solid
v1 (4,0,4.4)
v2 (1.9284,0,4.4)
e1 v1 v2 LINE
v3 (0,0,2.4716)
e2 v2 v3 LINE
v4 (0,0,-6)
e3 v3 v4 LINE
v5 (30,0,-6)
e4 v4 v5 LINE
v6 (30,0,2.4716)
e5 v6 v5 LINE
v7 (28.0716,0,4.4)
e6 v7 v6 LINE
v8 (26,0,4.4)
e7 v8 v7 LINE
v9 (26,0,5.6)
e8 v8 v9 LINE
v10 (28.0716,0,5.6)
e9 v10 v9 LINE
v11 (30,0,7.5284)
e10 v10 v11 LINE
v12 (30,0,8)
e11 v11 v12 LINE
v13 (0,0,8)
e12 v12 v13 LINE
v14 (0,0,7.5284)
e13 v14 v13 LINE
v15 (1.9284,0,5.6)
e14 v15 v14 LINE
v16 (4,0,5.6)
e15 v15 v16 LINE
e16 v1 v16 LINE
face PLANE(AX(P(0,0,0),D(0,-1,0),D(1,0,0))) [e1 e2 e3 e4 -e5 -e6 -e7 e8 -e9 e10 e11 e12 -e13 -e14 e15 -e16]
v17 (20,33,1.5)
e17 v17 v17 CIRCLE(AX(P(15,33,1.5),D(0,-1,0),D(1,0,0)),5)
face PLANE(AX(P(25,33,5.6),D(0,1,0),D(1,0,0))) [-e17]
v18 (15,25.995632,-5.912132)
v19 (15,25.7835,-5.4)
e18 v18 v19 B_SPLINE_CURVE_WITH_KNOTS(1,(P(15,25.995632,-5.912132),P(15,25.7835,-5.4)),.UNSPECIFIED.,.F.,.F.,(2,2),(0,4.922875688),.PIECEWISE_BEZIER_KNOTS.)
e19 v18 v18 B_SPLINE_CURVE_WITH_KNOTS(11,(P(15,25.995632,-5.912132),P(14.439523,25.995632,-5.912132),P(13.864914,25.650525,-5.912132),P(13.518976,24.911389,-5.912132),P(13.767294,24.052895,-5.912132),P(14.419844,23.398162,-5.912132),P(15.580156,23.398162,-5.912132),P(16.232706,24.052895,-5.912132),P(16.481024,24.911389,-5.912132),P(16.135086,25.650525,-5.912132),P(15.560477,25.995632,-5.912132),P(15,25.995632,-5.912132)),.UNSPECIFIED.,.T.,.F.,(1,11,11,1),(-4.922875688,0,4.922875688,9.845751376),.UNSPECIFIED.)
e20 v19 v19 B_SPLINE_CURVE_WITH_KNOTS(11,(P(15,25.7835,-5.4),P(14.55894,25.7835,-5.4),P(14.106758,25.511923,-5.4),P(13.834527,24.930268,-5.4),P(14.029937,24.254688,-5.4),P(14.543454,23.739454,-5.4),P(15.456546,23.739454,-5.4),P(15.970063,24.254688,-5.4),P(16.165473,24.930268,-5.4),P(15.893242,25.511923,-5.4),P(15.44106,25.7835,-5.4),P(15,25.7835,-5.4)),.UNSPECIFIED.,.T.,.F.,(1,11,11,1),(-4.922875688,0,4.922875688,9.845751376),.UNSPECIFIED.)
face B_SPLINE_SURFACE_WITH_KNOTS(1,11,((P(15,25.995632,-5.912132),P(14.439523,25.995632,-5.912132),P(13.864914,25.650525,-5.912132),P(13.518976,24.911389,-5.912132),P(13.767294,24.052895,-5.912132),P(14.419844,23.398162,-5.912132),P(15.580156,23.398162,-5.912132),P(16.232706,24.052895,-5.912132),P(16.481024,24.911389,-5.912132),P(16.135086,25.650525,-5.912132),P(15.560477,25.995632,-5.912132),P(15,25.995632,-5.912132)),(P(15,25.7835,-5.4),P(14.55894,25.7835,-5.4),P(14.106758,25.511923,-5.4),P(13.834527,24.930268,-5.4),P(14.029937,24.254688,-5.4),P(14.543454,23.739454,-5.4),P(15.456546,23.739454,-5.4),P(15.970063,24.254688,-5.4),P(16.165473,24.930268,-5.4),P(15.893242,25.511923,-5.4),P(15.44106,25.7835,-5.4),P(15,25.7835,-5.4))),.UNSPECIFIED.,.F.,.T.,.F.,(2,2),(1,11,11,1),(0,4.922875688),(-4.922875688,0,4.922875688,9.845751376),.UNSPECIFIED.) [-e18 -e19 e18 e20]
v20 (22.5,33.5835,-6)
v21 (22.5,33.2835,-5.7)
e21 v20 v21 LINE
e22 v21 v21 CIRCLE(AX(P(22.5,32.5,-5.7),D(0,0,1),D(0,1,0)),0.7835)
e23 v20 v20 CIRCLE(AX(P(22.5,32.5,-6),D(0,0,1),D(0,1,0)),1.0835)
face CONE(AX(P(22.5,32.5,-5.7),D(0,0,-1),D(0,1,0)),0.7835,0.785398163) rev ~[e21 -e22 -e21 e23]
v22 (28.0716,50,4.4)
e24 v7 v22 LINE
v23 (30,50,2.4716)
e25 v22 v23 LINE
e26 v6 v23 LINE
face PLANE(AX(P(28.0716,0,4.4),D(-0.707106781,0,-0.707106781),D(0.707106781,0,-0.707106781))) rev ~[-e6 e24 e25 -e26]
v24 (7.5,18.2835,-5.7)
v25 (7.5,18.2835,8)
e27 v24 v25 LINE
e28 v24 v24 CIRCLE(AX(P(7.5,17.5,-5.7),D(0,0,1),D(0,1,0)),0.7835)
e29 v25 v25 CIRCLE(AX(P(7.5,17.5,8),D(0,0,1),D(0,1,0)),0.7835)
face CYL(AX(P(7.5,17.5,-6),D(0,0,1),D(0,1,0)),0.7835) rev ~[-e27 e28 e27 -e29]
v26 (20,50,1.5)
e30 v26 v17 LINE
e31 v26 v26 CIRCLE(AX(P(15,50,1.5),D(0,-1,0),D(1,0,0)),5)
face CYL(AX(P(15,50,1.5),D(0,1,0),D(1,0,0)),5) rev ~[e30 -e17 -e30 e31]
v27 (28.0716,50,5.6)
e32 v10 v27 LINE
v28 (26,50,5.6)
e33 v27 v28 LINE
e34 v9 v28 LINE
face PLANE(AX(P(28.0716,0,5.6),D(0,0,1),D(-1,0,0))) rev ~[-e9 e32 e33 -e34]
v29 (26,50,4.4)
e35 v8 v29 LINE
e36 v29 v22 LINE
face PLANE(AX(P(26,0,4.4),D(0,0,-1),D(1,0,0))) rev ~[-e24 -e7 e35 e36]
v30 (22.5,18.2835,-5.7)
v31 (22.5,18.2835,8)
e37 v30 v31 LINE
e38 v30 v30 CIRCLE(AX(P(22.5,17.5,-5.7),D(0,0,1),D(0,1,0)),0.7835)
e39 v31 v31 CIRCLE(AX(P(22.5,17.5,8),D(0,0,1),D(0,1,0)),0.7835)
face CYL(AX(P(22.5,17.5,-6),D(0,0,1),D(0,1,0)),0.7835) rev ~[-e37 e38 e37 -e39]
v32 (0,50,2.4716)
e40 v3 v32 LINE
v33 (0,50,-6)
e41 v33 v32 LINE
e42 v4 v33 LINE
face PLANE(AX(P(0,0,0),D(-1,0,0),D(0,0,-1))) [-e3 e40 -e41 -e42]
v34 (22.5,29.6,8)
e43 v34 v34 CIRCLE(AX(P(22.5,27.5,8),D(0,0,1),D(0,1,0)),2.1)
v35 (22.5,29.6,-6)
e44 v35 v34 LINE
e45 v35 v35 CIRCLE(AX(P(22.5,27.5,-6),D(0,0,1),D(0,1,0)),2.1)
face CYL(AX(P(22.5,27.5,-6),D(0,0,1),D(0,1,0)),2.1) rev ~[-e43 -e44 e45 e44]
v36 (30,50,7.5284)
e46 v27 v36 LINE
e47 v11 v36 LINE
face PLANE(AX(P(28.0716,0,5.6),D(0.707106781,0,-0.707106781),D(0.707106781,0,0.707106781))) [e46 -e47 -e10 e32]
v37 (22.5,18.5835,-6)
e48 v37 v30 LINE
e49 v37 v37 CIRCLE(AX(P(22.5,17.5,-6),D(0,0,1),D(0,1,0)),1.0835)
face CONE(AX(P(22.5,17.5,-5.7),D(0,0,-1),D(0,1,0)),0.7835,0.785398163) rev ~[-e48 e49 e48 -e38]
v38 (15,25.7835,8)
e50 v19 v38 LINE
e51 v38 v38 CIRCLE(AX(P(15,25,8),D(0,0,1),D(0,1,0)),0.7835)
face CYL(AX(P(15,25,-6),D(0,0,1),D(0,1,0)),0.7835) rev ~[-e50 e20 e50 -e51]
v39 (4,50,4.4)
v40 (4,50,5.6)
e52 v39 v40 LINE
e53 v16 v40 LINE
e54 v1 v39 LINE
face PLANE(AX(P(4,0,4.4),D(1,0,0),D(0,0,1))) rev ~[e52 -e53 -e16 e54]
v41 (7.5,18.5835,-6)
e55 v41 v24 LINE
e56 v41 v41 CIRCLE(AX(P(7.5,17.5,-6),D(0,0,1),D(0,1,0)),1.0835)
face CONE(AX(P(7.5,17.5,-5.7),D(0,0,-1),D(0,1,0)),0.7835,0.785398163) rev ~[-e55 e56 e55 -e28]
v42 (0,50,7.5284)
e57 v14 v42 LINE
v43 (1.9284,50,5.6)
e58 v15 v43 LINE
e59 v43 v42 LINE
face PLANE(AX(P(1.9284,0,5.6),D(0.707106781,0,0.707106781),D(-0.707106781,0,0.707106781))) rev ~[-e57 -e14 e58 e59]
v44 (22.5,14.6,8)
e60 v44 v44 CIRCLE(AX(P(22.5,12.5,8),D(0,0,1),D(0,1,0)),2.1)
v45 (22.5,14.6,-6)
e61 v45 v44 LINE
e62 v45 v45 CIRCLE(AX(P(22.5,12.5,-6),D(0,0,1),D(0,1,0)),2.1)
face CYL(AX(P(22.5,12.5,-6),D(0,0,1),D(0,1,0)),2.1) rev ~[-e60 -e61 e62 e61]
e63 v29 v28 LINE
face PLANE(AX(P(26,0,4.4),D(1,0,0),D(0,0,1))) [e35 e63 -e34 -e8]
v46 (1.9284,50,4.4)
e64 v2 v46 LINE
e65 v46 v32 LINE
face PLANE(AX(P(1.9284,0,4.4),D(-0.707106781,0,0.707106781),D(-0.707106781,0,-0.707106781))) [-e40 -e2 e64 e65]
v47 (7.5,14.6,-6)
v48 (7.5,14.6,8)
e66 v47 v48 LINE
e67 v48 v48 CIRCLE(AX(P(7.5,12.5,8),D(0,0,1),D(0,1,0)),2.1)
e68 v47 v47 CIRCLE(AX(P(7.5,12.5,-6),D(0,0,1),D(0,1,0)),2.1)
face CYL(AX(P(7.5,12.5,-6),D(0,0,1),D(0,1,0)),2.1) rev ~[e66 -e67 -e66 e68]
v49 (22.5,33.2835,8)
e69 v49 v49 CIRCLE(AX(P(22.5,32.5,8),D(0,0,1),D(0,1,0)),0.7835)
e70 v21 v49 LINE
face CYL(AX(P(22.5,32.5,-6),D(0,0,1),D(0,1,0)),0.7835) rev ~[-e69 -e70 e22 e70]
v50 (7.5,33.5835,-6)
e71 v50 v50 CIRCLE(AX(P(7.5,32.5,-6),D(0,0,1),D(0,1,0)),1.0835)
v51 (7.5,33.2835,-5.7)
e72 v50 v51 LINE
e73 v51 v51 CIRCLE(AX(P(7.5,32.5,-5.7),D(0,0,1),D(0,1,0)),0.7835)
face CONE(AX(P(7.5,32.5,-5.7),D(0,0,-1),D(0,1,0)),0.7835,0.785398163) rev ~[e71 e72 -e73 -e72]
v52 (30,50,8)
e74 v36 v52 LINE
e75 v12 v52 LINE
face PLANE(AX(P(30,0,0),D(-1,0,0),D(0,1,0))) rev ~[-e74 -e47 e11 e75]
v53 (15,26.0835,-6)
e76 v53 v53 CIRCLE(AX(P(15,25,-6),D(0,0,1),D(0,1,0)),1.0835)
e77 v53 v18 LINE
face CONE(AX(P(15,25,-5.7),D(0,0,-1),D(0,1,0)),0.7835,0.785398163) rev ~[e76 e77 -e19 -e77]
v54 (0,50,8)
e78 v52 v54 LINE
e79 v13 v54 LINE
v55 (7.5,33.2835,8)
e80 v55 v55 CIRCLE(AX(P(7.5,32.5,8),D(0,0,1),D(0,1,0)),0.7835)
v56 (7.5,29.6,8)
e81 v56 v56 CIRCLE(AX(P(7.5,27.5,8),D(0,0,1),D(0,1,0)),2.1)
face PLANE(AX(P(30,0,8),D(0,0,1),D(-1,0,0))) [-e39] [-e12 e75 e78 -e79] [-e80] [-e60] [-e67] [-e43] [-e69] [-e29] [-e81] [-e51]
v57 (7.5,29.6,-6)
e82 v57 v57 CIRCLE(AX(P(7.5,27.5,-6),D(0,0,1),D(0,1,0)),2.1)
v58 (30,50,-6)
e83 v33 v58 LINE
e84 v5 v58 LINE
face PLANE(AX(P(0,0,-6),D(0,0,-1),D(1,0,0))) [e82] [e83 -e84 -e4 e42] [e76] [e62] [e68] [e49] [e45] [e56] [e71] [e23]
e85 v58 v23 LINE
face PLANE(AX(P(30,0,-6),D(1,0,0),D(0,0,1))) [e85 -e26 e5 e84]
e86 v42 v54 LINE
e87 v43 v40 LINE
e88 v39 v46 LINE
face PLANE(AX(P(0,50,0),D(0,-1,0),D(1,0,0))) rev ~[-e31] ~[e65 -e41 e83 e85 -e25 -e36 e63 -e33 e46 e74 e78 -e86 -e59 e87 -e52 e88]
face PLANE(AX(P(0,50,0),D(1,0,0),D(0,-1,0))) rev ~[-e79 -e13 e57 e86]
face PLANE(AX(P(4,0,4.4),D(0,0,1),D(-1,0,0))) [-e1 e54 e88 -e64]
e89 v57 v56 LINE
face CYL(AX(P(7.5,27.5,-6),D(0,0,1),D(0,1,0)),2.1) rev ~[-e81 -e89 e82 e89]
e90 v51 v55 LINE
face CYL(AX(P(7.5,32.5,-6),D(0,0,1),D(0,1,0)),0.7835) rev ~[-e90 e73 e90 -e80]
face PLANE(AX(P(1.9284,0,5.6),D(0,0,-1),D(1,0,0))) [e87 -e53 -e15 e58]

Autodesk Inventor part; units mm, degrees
ref_plane "YZ Plane" through (0, 0, 0) normal (1, 0, 0) x (0, 1, 0)
ref_plane "XZ Plane" through (0, 0, 0) normal (0, 1, 0) x (-1, 0, 0)
ref_plane "XY Plane" through (0, 0, 0) normal (0, 0, 1) x (1, 0, 0)
sketch "Sketch1" plane through (0, 0, 0) normal (0, 0, 1) x (1, 0, 0)
  line L0 (0, 0) -> (30, 0)
  line L1 (30, 0) -> (30, 50)
  line L2 (30, 50) -> (0, 50)
  line L3 (0, 50) -> (0, 0)
  dimension "d0" = 30
  dimension "d1" = 50
extrude "Extrusion1" add sketch "Sketch1" along normal blind 10
sketch "Sketch2" plane through (0, 0, 0) normal (0, -1, 0) x (1, 0, 0)
  line L0 (30, 0) -> (30, 10) projected
  line L1 (30, 0) -> (30, 1.5)
  line L2 (15, 0) -> (15, 12.0836) construction
  line L3 (30, 10) -> (30, 9) construction
  line L4 (30, 9) -> (-1.4785, 9) construction
  line L5 (27.4716, 5) -> (-0.9945, 5) construction
  line L6 (30, 5) -> (30.3, 5) construction
  line L7 (28.0716, 4.4) -> (30, 2.4716)
  line L8 (28.0716, 5.6) -> (30, 7.5284)
  line L9 (30, 5) -> (30, 5.6) construction
  line L10 (28.0716, 5.6) -> (25, 5.6)
  line L11 (25, 5.6) -> (25, 4.4)
  line L12 (25, 4.4) -> (28.0716, 4.4)
  arc A0 (30, 6.9774) -> (28.8858, 6.4142) centre (30.3, 5) ccw construction
  arc A1 (28.3921, 4.4) -> (28.8858, 3.5858) centre (30.3, 5) ccw construction
  line L13 (1.9284, 4.4) -> (0, 2.4716)
  line L14 (1.9284, 5.6) -> (0, 7.5284)
  line L15 (1.9284, 5.6) -> (5, 5.6)
  line L16 (5, 5.6) -> (5, 4.4)
  line L17 (5, 4.4) -> (1.9284, 4.4)
  line L18 (30, 10) -> (0, 10) projected
  line L19 (0, 0) -> (0, 10) projected
  line L20 (0, 10) -> (0, 0)
  line L21 (30, 0) -> (30, -3)
  line L22 (30, -3) -> (0, -3)
  line L23 (0, -3) -> (0, 0)
  line L24 (30, 0) -> (0, 0) projected
  line L25 (0, 0) -> (30, 0)
  circle A2 centre (15, 5) radius 1.5
  line L26 (4, 4.4) -> (4, 5.6)
  line L27 (25, 4.4) -> (26, 4.4)
  line L28 (26, 4.4) -> (26, 5.6)
  line L29 (25, 5.6) -> (25, 4.4)
  point P0 (4, 5)
  dimension "d4" = 1.5
  dimension "d7" = 1
  dimension "d9" = 0.3
  dimension "d11" = 90
  dimension "d12" = 0.6
  dimension "d13" = 5
  dimension "d14" = 1.2
  dimension "d27" = 3
  dimension "d31" = 3
  dimension "d90" = 5
  dimension "d91" = 4
  dimension "d94" = 1
extrude "Extrusion3" cut sketch "Sketch2" against normal blind 50 contours L7 L12 L28 L10 L8 L0 | L19 L14 L15 L26 L17 L13
sketch "Sketch4" plane through (0, 0, 0) normal (0, -1, 0) x (1, 0, 0)
  line L0 (30, 0) -> (0, 0) projected
  line L1 (30, 0) -> (0, 0)
  line L2 (0, 0) -> (0, -6)
  line L3 (0, -6) -> (30, -6)
  line L4 (30, -6) -> (30, 0)
  dimension "d28" = 6
extrude "Extrusion5" add sketch "Sketch4" against normal blind 50
sketch "Sketch5" plane through (1.9284, 0, 5.6) normal (0, -1, 0) x (1, 0, 0)
  line L0 (23.0716, -1.2) -> (23.0716, 0) projected
  line L1 (23.0716, -0.6) -> (3.0716, -0.6) construction
  line L2 (19.0716, 2.4) -> (7.0716, 2.4) projected
  line L3 (13.0716, 2.4) -> (13.0716, -11.6) construction
  line L4 (-1.9284, -11.6) -> (28.0716, -11.6) projected
  line L5 (13.0716, 2.4) -> (13.0716, -4.1)
  line L6 (13.0716, -4.1) -> (-1.9284, -4.1) construction
  line L7 (-1.9284, -11.6) -> (-1.9284, -3.1284) construction
  point P0 (-1.9284, -5.6)
  dimension "d33" = 6.5
ref_plane "Work Plane1" through (30, 0, -6) normal (0, 0, -1) x (-1, 0, 0)
sketch "Sketch7" plane through (25, 50, 5.6) normal (0, 1, 0) x (1, 0, 0)
  line L0 (-25, -1.9284) -> (-23.0716, 0) projected
  line L1 (-25, 11.6) -> (-25, 3.1284) projected
  line L2 (-25, -1.9284) -> (-25, 3.1284)
  line L3 (-23.0716, 1.2) -> (-25, 3.1284) projected
  line L4 (-25, 3.1284) -> (-23.0716, 1.2)
  line L5 (-20, 0) -> (-20, 1.2) projected
  line L6 (-23.0716, 1.2) -> (-20, 1.2)
  line L7 (-20, 1.2) -> (-20, 0)
  line L8 (-20, 0) -> (-23.0716, 0)
  line L9 (-23.0716, 0) -> (-25, -1.9284)
  line L10 (0, 0) -> (0, 1.2) projected
  line L11 (0, 0) -> (0, 1.2)
  line L12 (0, 1.2) -> (3.4081, 1.2)
  line L13 (3.0716, 1.2) -> (5, 3.1284) projected
  line L14 (5, 3.1284) -> (3.0716, 1.2)
  line L15 (3.0716, 0) -> (1, 0) projected
  line L16 (0, 0) -> (3.0716, 0)
  line L17 (5, -1.9284) -> (3.0716, 0) projected
  line L18 (3.0716, 0) -> (5, -1.9284)
  line L19 (5, -1.9284) -> (5, 3.1284)
  point P0 (-25, 5.6)
sketch "Sketch8" plane through (1.9284, 0, 5.6) normal (0, -1, 0) x (1, 0, 0)
  line L0 (28.0716, 1.9284) -> (28.0716, 4.4) projected
  line L1 (28.0716, 1.9284) -> (28.0716, -3.1284)
  line L2 (28.0716, -3.1284) -> (26.1431, -1.2)
  line L3 (23.0716, -1.2) -> (23.0716, 0) projected
  line L4 (26.1431, -1.2) -> (23.0716, -1.2)
  line L5 (23.0716, -1.2) -> (23.0716, 0)
  line L6 (23.0716, 0) -> (26.1431, 0)
  line L7 (26.1431, 0) -> (28.0716, 1.9284)
  line L8 (13.0716, -3.7758) -> (13.0716, 8.1492) construction
  line L9 (-1.9284, -3.1284) -> (0, -1.2)
  line L10 (-1.9284, 1.9284) -> (-1.9284, -3.1284)
  line L11 (3.0716, -1.2) -> (3.0716, 0)
  line L12 (0, -1.2) -> (3.0716, -1.2)
  line L13 (3.0716, 0) -> (0, 0)
  line L14 (0, 0) -> (-1.9284, 1.9284)
  line L15 (23.0716, -1.2) -> (24.0716, -1.2)
  line L16 (24.0716, -1.2) -> (24.0716, 0)
  line L17 (23.0716, 0) -> (23.0716, -1.2)
  point P0 (-1.9284, -5.6)
  dimension "d93" = 1
sketch "Sketch10" plane through (30, 0, -6) normal (0, 0, -1) x (-1, 0, 0)
  line L0 (0, 50) -> (30, 50) construction
  line L1 (0, 50) -> (7.5, 50) construction
  line L2 (7.5, 50) -> (7.5, 32.5) construction
  line L3 (30, 50) -> (22.5, 50) construction
  line L4 (22.5, 50) -> (22.5, 32.5) construction
  line L5 (30, 0) -> (0, 0) construction
  line L6 (0, 0) -> (7.5, 0) construction
  line L7 (7.5, 0) -> (7.5, 17.5) construction
  line L8 (30, 0) -> (22.5, 0) construction
  line L9 (22.5, 0) -> (22.5, 17.5) construction
  line L10 (21, 50) -> (9, 50) construction
  line L11 (15, 50) -> (15, 25) construction
  line L12 (0, 0) -> (0, 50) construction
  line L13 (15, 25) -> (0, 25)
  point P0 (0, 5)
  point P1 (0, 45)
  dimension "d53" = 7.5
  dimension "d54" = 17.5
  dimension "d55" = 7.5
  dimension "d56" = 17.5
  dimension "d57" = 7.5
  dimension "d58" = 17.5
  dimension "d59" = 7.5
  dimension "d60" = 17.5
hole "Hole2" at (22.5, 17.5, -6) at (7.5, 17.5, -6) at (7.5, 32.5, -6) at (22.5, 32.5, -6) at (15, 25, -6) direction (0, 0, 1) diameter 1.567 end through all thread size "M2x0.4" class "6H" standard "ISO Metric profile"
sketch "Sketch11" plane through (30, 0, -6) normal (0, 0, -1) x (-1, 0, 0)
  circle A0 centre (22.5, 32.5) radius 0.7835 projected
  circle A1 centre (7.5, 32.5) radius 0.7835 projected
  point P0 (30, 0)
  point P1 (22.5, 12.5)
  point P2 (7.5, 12.5)
  point P3 (22.5, 27.5)
  point P4 (7.5, 27.5)
  dimension "d68" = 20
  dimension "d76" = 15
hole "Hole3" at (7.5, 12.5, -6) at (22.5, 12.5, -6) at (7.5, 27.5, -6) at (22.5, 27.5, -6) direction (0, 0, 1) diameter 4.2 end through all
chamfer "Chamfer1" distance 0.3 angle 45 5 edges at (7.5, 31.7165, -6) (7.5, 16.7165, -6) (22.5, 16.7165, -6) (22.5, 31.7165, -6) (15, 24.2165, -6)
sketch "Sketch12" plane through (0, 0, 10) normal (0, -1, 0) x (1, 0, 0)
  line L0 (30, -2.4716) -> (30, 0) projected
  line L1 (30, 0) -> (30, -2)
  line L2 (30, -2) -> (0, -2)
  line L3 (30, -2) -> (30, 0)
  line L4 (0, 0) -> (30, 0) projected
  line L5 (0, 0) -> (0, -2)
  line L6 (0, -2.4716) -> (0, 0) projected
  point P0 (0, -10)
  dimension "d80" = 2
extrude "Extrusion10" cut sketch "Sketch12" against normal through all
chamfer "Chamfer2" distance 0.3 angle 45 1 edges at (15, 24.2165, -5.7)
sketch "Sketch13" plane through (25, 50, 5.6) normal (0, 1, 0) x (1, 0, 0)
  line L0 (-8.9165, 11.6) -> (-11.0835, 11.6) construction
  line L1 (-10, 11.6) -> (-10, 3.4303) construction
  point P0 (-25, 5.6)
sketch "Sketch14" plane through (25, 50, 5.6) normal (0, 1, 0) x (1, 0, 0)
  line L0 (-10.7835, -2.4) -> (-9.2165, -2.4) projected
  line L1 (-10, -2.4) -> (-10, 4.1)
  circle A0 centre (-10, 4.1) radius 5
  point P0 (-25, 5.6)
  dimension "d86" = 6.5
  dimension "d87" = 10
extrude "Extrusion11" cut sketch "Sketch14" against normal blind 17
sketch "Sketch15" plane through (25, 0, 4.4) normal (0, -1, 0) x (1, 0, 0)
  line L0 (3.0716, 0) -> (1, 0) projected
  line L1 (0, 0) -> (1, 0)
  line L2 (1, 0) -> (1, 1.2)
  line L3 (1, 1.2) -> (3.0716, 1.2) projected
  line L4 (1, 0) -> (0, 0)
  line L5 (0, 0) -> (0, 1.2) projected
  line L6 (0, 1.2) -> (1, 1.2)
  point P0 (-25, -4.4)
  dimension "d92" = 1
equation "\"d54\" = d56"
equation "\"d58\" = d56"
equation "\"d60\" = d56"
properties part number "Platform" material "Steel, Carbon"
